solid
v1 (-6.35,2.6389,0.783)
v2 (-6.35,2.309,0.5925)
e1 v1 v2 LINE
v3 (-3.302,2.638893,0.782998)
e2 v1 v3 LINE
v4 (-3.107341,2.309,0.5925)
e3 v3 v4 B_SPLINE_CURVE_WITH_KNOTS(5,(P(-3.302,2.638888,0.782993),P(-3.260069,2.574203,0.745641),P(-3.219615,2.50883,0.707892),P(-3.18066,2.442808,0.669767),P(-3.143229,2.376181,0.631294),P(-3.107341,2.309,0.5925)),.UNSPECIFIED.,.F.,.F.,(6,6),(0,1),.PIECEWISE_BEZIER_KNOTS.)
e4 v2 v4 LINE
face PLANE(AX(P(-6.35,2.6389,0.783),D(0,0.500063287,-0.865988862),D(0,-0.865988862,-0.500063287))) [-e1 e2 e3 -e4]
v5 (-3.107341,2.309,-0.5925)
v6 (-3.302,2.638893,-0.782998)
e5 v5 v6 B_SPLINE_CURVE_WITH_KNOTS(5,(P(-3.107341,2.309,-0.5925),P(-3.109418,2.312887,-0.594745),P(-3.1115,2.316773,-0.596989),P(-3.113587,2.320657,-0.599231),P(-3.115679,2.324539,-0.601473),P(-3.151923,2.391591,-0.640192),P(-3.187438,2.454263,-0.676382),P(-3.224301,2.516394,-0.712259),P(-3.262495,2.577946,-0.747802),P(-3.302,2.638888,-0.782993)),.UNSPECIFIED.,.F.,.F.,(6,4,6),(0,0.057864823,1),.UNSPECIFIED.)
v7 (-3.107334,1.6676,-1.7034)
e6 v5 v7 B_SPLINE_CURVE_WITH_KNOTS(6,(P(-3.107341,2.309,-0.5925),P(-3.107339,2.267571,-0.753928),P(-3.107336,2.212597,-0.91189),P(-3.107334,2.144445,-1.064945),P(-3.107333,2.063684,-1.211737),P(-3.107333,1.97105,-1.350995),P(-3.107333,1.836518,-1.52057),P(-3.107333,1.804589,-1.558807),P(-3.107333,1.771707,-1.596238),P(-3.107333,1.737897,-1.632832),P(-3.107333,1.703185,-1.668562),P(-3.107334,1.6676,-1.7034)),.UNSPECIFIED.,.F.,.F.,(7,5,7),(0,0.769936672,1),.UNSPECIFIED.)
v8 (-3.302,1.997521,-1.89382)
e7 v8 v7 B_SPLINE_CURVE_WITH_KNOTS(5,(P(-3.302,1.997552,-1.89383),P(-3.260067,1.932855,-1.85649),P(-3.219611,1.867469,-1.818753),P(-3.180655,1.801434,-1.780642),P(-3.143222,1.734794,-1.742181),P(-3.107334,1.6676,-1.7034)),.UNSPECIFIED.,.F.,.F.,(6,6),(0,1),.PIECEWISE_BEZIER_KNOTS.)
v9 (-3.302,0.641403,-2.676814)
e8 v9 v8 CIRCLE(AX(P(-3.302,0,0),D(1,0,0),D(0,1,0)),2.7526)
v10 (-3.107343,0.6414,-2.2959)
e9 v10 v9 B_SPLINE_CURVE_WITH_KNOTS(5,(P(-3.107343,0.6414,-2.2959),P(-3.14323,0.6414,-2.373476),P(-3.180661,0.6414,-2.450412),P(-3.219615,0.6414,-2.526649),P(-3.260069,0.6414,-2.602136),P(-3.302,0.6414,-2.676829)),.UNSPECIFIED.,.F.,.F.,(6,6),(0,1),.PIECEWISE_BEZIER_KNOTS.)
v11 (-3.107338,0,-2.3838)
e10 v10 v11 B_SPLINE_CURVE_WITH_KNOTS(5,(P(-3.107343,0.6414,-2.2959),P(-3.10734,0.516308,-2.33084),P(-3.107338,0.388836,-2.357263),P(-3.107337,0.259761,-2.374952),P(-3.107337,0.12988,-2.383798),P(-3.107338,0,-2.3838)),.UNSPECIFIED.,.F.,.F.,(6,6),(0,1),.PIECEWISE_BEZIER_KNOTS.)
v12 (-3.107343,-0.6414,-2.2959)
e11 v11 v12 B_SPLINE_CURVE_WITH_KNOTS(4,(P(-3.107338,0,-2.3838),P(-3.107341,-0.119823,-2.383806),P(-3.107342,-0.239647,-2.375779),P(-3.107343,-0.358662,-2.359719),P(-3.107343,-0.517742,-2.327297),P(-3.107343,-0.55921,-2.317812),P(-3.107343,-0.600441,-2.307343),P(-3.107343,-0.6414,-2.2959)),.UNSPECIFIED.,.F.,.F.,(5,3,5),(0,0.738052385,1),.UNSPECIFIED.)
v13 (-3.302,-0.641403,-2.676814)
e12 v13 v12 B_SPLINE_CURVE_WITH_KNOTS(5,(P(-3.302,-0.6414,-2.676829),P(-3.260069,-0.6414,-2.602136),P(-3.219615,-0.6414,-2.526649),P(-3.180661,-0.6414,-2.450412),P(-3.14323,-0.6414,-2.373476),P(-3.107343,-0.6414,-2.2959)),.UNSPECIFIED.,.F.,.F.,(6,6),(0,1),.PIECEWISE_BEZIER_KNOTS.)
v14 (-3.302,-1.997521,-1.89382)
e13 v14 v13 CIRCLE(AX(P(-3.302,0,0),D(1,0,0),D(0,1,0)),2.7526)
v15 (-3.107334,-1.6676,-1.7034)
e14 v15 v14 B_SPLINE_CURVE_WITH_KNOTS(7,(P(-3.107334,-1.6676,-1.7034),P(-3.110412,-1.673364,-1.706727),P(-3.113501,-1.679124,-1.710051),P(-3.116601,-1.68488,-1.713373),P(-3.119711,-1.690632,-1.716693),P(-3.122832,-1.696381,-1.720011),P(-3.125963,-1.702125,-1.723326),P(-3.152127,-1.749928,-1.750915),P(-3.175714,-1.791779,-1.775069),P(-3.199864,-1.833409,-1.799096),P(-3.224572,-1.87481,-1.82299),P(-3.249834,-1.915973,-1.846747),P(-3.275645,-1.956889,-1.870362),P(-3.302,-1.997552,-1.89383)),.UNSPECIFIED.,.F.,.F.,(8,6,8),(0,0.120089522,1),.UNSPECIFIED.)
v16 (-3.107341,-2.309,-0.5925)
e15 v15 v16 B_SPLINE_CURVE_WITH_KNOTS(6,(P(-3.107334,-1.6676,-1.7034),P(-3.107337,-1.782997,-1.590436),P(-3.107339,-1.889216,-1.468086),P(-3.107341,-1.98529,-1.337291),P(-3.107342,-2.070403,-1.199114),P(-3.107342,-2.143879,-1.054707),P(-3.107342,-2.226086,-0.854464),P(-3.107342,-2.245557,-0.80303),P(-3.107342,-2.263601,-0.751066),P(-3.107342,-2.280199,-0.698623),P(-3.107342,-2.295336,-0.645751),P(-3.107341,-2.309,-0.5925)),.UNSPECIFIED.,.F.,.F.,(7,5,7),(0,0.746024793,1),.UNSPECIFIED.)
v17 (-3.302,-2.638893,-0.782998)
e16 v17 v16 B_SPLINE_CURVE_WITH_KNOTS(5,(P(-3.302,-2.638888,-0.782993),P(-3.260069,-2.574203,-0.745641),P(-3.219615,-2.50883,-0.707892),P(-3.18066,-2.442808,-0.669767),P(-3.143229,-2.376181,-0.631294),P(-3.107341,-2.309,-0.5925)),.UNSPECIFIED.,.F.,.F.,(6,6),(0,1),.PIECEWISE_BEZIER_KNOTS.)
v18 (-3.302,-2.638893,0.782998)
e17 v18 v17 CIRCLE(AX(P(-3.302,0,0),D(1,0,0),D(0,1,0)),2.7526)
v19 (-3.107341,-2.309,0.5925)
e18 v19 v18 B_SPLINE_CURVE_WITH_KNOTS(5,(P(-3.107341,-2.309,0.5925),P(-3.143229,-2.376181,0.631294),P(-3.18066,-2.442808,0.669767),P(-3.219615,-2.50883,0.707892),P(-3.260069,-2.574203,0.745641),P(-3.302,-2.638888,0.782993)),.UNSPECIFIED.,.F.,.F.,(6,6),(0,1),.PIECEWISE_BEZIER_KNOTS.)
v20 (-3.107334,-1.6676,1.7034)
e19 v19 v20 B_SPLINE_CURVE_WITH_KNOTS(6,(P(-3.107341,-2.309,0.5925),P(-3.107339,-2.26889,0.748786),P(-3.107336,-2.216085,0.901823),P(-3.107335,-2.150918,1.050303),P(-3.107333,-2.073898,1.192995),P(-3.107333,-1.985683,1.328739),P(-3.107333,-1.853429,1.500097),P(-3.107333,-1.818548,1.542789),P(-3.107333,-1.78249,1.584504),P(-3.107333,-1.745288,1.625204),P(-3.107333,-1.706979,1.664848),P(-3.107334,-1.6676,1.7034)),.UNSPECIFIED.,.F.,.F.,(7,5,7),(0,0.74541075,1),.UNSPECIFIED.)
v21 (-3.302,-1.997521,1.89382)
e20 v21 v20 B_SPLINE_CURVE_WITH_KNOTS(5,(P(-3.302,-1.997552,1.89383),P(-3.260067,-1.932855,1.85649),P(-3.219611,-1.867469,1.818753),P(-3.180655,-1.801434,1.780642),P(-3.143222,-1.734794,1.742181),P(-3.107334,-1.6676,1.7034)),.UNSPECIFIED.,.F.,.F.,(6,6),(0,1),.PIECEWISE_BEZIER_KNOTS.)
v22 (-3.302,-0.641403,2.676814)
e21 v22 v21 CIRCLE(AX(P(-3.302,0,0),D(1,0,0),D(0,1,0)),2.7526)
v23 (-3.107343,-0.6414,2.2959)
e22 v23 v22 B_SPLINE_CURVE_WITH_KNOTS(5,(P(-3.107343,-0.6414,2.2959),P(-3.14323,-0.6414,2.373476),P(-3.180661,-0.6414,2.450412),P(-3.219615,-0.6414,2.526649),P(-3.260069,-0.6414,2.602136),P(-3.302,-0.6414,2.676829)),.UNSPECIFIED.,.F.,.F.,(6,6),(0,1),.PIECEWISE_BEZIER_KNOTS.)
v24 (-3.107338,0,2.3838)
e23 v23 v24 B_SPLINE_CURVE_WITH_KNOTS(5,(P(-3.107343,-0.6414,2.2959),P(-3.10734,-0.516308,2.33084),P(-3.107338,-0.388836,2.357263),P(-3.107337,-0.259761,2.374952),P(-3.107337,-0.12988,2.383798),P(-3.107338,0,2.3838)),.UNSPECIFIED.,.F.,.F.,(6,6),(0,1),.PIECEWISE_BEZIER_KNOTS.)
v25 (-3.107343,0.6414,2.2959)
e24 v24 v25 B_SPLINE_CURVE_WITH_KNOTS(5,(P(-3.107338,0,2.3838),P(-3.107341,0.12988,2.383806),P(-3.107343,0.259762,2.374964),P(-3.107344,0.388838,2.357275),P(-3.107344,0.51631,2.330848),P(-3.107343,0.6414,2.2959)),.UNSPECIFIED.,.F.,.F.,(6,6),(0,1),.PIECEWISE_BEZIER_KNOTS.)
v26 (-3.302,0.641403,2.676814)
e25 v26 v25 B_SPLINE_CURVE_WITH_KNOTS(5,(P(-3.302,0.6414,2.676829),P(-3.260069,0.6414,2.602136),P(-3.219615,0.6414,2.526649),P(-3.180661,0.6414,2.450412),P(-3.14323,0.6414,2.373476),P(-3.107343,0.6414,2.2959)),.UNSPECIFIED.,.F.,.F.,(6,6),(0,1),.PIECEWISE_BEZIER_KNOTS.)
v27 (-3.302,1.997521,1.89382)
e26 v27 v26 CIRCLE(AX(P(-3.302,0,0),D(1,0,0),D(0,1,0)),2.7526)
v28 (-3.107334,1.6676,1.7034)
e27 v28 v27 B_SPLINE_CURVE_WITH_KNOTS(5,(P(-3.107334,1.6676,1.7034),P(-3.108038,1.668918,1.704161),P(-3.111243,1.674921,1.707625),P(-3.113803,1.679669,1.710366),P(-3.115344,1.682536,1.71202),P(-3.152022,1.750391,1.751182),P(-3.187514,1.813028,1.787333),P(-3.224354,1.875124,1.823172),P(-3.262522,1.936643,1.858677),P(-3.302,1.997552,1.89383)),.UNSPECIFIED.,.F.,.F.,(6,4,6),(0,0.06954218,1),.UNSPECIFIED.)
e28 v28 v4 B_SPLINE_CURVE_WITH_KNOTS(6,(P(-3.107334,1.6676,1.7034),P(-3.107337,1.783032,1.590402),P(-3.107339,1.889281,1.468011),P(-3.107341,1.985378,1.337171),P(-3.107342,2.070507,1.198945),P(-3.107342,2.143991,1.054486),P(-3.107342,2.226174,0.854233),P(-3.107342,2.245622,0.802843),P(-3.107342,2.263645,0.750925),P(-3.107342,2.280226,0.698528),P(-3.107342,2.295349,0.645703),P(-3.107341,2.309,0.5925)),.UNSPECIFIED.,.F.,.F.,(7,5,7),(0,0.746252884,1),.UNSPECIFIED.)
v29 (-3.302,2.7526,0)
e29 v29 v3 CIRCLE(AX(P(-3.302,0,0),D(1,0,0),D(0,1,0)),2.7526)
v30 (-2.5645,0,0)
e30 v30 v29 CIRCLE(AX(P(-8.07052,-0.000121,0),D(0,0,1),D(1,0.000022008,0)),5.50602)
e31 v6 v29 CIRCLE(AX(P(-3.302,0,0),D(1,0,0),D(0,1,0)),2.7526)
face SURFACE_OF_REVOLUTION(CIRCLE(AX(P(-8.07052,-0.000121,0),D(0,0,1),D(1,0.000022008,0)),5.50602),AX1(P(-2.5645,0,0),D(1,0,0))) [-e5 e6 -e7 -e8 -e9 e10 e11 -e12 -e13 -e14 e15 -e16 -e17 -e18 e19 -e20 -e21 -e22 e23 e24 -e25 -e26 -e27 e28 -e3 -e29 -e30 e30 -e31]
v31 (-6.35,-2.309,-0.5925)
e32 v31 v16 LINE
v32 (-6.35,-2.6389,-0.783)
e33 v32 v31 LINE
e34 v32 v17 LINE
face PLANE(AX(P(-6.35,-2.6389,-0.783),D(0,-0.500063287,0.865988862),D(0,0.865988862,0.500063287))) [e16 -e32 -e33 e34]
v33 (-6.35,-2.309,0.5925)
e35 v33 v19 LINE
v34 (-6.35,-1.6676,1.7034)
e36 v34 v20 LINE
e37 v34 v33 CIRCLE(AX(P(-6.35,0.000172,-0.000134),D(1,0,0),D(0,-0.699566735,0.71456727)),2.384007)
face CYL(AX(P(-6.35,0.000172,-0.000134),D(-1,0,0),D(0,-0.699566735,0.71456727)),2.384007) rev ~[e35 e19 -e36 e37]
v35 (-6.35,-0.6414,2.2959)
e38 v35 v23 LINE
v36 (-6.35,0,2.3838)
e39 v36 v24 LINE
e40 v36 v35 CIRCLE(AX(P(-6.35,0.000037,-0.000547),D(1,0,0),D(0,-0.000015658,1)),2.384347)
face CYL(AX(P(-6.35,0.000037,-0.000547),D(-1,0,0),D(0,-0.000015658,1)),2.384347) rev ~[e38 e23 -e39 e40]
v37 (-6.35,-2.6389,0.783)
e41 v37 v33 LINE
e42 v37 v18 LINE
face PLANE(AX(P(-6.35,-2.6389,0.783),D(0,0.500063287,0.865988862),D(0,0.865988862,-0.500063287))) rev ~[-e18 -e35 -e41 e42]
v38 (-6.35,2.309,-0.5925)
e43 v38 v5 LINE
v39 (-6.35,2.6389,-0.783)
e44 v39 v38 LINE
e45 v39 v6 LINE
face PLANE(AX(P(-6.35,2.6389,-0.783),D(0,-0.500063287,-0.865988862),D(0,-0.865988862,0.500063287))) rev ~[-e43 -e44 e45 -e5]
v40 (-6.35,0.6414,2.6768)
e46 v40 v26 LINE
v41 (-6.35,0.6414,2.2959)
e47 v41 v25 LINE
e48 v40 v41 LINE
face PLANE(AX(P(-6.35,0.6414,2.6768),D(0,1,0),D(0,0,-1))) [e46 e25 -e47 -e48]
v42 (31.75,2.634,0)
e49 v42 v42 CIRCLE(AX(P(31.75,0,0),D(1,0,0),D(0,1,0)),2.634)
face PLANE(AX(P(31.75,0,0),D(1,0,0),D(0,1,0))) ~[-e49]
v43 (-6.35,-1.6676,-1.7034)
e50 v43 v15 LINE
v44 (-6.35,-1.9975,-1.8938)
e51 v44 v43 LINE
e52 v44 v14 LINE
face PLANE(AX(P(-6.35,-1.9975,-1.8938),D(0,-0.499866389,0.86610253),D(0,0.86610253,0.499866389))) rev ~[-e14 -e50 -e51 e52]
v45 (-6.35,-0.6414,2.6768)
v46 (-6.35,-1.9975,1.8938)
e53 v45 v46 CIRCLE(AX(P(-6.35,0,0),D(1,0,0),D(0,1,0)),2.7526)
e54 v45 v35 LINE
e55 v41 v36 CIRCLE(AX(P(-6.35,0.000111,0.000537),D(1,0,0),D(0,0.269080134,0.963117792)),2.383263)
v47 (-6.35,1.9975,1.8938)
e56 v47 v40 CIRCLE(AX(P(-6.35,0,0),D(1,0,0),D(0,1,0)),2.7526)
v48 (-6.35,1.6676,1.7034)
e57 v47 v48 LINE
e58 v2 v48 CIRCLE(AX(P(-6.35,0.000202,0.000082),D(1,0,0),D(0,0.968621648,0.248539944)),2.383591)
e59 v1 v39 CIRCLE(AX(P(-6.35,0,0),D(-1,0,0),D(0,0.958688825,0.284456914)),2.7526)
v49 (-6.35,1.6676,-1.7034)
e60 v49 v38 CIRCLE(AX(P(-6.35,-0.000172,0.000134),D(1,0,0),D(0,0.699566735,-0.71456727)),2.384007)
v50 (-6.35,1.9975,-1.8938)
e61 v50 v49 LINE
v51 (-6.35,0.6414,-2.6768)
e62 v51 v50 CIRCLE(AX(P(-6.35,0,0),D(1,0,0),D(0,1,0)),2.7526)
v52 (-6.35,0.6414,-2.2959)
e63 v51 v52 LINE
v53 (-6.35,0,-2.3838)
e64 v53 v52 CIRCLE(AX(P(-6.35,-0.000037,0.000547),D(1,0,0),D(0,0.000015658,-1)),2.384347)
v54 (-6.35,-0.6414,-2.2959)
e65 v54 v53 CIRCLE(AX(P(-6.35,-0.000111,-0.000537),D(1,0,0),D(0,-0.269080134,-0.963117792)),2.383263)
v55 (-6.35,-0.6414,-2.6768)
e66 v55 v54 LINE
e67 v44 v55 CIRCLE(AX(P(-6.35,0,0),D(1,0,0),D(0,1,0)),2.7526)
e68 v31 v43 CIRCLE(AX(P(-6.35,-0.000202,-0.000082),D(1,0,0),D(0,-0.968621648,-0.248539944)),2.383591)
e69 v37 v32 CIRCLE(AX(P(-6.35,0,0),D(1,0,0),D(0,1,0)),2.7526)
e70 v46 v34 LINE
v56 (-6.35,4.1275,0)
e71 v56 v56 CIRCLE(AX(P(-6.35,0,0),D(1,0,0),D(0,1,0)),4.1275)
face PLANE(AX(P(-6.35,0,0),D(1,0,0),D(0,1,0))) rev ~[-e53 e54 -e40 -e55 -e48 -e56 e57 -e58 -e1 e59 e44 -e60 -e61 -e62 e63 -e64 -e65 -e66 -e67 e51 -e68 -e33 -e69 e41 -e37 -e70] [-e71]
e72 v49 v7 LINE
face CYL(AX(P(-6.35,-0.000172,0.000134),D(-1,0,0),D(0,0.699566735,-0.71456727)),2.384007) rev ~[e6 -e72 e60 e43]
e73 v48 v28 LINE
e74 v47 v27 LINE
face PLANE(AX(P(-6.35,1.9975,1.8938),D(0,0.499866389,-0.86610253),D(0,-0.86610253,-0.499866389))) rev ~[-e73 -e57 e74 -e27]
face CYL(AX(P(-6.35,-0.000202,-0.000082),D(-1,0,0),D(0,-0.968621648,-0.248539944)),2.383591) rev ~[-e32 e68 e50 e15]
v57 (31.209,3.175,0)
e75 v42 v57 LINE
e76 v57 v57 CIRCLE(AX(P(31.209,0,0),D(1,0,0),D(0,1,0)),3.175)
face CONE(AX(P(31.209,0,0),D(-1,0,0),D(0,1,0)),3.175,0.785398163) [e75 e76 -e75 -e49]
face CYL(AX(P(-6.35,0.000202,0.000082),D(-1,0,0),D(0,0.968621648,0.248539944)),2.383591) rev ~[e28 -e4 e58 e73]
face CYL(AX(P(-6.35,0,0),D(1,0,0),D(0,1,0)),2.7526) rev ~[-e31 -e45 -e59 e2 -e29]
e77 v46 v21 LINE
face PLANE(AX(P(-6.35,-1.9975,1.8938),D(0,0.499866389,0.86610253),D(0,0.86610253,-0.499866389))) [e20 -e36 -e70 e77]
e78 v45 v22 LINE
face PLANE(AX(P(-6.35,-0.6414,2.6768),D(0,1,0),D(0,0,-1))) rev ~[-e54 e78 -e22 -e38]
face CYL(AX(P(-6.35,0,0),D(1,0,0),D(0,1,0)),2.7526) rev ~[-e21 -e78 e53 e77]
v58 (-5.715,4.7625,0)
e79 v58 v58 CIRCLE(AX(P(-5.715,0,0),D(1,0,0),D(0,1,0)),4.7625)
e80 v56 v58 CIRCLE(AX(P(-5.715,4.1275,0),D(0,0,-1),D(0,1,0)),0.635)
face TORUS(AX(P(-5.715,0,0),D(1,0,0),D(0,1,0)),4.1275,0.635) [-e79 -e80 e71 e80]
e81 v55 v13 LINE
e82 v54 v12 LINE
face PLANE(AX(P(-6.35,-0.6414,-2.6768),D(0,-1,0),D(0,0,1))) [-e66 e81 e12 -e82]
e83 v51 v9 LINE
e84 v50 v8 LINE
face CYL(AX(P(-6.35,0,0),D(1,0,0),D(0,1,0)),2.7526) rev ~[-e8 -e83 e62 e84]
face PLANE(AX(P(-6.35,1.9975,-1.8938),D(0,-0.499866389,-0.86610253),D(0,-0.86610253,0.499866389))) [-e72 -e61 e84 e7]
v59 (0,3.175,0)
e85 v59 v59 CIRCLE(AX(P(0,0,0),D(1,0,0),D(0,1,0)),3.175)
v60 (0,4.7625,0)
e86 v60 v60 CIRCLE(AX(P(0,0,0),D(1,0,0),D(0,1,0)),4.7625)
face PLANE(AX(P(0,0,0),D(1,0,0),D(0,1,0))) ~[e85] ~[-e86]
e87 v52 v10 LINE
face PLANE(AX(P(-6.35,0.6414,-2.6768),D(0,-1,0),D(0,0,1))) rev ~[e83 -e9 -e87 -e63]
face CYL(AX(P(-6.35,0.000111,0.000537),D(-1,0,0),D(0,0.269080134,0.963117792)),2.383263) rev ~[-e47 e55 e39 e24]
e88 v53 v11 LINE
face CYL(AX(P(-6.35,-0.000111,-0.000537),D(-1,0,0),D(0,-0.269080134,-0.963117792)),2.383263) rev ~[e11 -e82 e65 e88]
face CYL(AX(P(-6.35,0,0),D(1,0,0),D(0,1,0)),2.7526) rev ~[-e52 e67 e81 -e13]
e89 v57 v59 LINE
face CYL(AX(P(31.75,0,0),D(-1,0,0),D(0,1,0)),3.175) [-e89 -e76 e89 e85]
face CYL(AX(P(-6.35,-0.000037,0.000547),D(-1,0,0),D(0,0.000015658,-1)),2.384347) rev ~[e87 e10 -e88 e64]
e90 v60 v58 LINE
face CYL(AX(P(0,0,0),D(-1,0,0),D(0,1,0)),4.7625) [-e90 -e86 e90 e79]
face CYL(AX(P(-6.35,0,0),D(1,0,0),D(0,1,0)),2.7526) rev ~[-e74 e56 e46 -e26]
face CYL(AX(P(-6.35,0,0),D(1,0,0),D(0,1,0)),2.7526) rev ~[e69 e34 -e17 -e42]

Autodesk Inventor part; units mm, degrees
ref_plane "YZ Plane" through (0, 0, 0) normal (1, 0, 0) x (0, 1, 0)
sketch "Sketch1" plane through (0, 0, 0) normal (0, 0, 1) x (1, 0, 0)
  line L0 (-6.35, 0) -> (31.75, 0)
  line L1 (31.75, 0) -> (31.75, 3.175)
  line L2 (31.75, 3.175) -> (0, 3.175)
  line L3 (0, 3.175) -> (0, 4.7625)
  line L4 (-16.0335, 0) -> (39.7139, 0) projected
  line L5 (0, -0.9525) -> (0, 5.715) projected
  line L6 (0, 4.7625) -> (-6.35, 4.7625)
  line L7 (-6.35, 0) -> (-6.35, 4.7625)
  arc A0 (-2.5645, 0) -> (-3.302, 2.7526) centre (-8.0696, 0) ccw
  line L8 (-6.35, 2.7526) -> (-3.302, 2.7526)
  line L9 (12.7, 3.175) -> (0, 3.175) construction
  dimension "d0" = 31.75
  dimension "d1" = 6.35
  dimension "d2" = 6.35
  dimension "d5" = 9.525
  dimension "d13" = 5.5051
  dimension "d14" = 5.5051
  dimension "d15" = 3.048
revolve "Body" add sketch "Sketch1" angle 360 about axis through (-6.35, 0, 0) along (1, 0, 0) contours A0 L8 L7 L6 L3 L5 L0 | L5 L2 L1 L0
ref_plane "IDS_WORKPLANE{1}" through (-6.35, 0, 0) normal (1, 0, 0) x (0, 0, -1)
sketch "Sketch2" plane through (-6.35, 0, 0) normal (1, 0, 0) x (0, 0, -1)
  line L0 (0, -6.6675) -> (0, 6.6675) projected
  line L1 (6.6675, 0) -> (-6.6675, 0) projected
  circle A0 centre (0, 0) radius 4.7625 projected
  line L2 (2.6768, 0.6414) -> (2.2959, 0.6414)
  line L3 (0, 0) -> (2.6768, 0.6414) construction
  line L4 (0, 0) -> (4.0727, 3.8613) construction
  line L5 (0, 0) -> (0.783, 2.6389) construction
  line L6 (0, 0) -> (1.3763, 2.3838) construction
  line L7 (0.783, 2.6389) -> (0.5925, 2.309)
  line L8 (1.8938, 1.9975) -> (1.7034, 1.6676)
  line L9 (0, 0) -> (1.8938, 1.9975) construction
  arc A1 (2.3838, 0) -> (2.2959, 0.6414) centre (0, 0) ccw
  arc A2 (1.7034, 1.6676) -> (0.5925, 2.309) centre (0, 0) ccw
  arc A3 (2.7526, 0) -> (2.6768, 0.6414) centre (0, 0) ccw
  arc A4 (1.8938, 1.9975) -> (0.783, 2.6389) centre (0, 0) ccw
  arc A5 (2.6768, 0.6414) -> (1.6232, 2.223) centre (0, 0) ccw construction
  arc A6 (2.2959, 0.6414) -> (1.7034, 1.6676) centre (0, 0) ccw construction
  line L10 (2.6768, -0.6414) -> (2.2959, -0.6414)
  line L11 (0.783, -2.6389) -> (0.5925, -2.309)
  line L12 (1.8938, -1.9975) -> (1.7034, -1.6676)
  arc A7 (2.2959, -0.6414) -> (2.3838, 0) centre (0, 0) ccw
  arc A8 (0.5925, -2.309) -> (1.7034, -1.6676) centre (0, 0) ccw
  arc A9 (2.6768, -0.6414) -> (2.7526, 0) centre (0, 0) ccw
  arc A10 (0.783, -2.6389) -> (1.8938, -1.9975) centre (0, 0) ccw
  line L13 (-2.6768, 0.6414) -> (-2.2959, 0.6414)
  line L14 (-0.783, 2.6389) -> (-0.5925, 2.309)
  line L15 (-1.8938, 1.9975) -> (-1.7034, 1.6676)
  arc A11 (-2.2959, 0.6414) -> (-2.3838, 0) centre (0, 0) ccw
  arc A12 (-0.5925, 2.309) -> (-1.7034, 1.6676) centre (0, 0) ccw
  arc A13 (-2.6768, 0.6414) -> (-2.7526, 0) centre (0, 0) ccw
  arc A14 (-0.783, 2.6389) -> (-1.8938, 1.9975) centre (0, 0) ccw
  line L16 (-0.783, -2.6389) -> (-0.5925, -2.309)
  arc A15 (-1.7034, -1.6676) -> (-0.5925, -2.309) centre (0, 0) ccw
  line L17 (-1.8938, -1.9975) -> (-1.7034, -1.6676)
  arc A16 (-1.8938, -1.9975) -> (-0.783, -2.6389) centre (0, 0) ccw
  arc A17 (-2.3838, 0) -> (-2.2959, -0.6414) centre (0, 0) ccw
  line L18 (-2.6768, -0.6414) -> (-2.2959, -0.6414)
  arc A18 (-2.7526, 0) -> (-2.6768, -0.6414) centre (0, 0) ccw
  point P0 (1.3763, -2.3838)
  point P1 (-1.3763, 2.3838)
  point P2 (-1.3763, -2.3838)
  dimension "d19" = 0.6413
  dimension "d20" = 1.2827
  dimension "d21" = 33.052
  dimension "d22" = 5.5051
  dimension "d23" = 4.7676
extrude "Slot" add sketch "Sketch2" along normal up to next contours A1 L2 A3 L1 | L1 A9 L10 A7 | A17 L18 A18 L1 | L1 A13 L13 A11 | A4 L8 A2 L7 | L11 A8 L12 A10 | L14 A12 L15 A14 | A16 L17 A15 L16
fillet "Fillet1" radius 0.635 1 edges at (-6.35, -4.7625, 0)
thread "Thread" size "1/4-28 UNF" class "2A" standard "ANSI Unified Screw Threads" length 30.3893
chamfer "Chamfer1" distance 0.541 distance2 0.541 1 edges at (31.75, -3.175, 0) measured on face at (31.75, -0.3658, -0.0841)
ref_plane "Work Plane2" through (-3.175, 0, 0) normal (0, 0, -1) x (1, 0, 0)
equation "\"d19\" = 0.5 * SBR"
equation "\"d20\" = SBR"
equation "\"d22\" = 1.1547 * SW"
equation "\"d23\" = SW"
equation "\"d17\" = INTI"
equation "\"d24\" = RR"
equation "\"d6\" = GEL"
equation "\"d9\" = -0.5 * SPD + 0.5 * NND"
equation "\"d10\" = GUL"
equation "\"d0\" = NLG"
equation "\"d1\" = KOH"
equation "\"d2\" = NND"
equation "\"d5\" = KOD"
equation "\"d13\" = 1.1547 * SW"
equation "\"d14\" = 1.1547 * SW"
equation "\"d15\" = INTI"
equation "\"NND\" = 6.35"
equation "\"NLG\" = 31.75"
equation "\"GEL\" = 30.38932"
equation "\"KOD\" = 9.525"
equation "\"KOH\" = 6.35"
equation "\"SPD\" = GD1"
equation "\"GUL\" = 0.54102"
equation "\"SBR\" = 1.2827"
equation "\"INTI\" = 3.048"
equation "\"d11\" = -KOH"
equation "\"SW\" = 4.76758"
equation "\"d16\" = 1.1547 * SW"
equation "\"d18\" = SW"
equation "\"RR\" = 0.635"
equation "\"TOA\" = 30deg"
equation "\"GD1\" = 5.26796"
equation "\"THREADDIA\" = 6.35"
equation "\"BDM\" = NND"
equation "\"GD\" = NND"
equation "\"GAL\" = 1.36068"
equation "\"E0\" = 5.55498"
properties part number "ANSI B18.3 - 1/4-28 UNF - 1.25" material "Steel, Mild"
